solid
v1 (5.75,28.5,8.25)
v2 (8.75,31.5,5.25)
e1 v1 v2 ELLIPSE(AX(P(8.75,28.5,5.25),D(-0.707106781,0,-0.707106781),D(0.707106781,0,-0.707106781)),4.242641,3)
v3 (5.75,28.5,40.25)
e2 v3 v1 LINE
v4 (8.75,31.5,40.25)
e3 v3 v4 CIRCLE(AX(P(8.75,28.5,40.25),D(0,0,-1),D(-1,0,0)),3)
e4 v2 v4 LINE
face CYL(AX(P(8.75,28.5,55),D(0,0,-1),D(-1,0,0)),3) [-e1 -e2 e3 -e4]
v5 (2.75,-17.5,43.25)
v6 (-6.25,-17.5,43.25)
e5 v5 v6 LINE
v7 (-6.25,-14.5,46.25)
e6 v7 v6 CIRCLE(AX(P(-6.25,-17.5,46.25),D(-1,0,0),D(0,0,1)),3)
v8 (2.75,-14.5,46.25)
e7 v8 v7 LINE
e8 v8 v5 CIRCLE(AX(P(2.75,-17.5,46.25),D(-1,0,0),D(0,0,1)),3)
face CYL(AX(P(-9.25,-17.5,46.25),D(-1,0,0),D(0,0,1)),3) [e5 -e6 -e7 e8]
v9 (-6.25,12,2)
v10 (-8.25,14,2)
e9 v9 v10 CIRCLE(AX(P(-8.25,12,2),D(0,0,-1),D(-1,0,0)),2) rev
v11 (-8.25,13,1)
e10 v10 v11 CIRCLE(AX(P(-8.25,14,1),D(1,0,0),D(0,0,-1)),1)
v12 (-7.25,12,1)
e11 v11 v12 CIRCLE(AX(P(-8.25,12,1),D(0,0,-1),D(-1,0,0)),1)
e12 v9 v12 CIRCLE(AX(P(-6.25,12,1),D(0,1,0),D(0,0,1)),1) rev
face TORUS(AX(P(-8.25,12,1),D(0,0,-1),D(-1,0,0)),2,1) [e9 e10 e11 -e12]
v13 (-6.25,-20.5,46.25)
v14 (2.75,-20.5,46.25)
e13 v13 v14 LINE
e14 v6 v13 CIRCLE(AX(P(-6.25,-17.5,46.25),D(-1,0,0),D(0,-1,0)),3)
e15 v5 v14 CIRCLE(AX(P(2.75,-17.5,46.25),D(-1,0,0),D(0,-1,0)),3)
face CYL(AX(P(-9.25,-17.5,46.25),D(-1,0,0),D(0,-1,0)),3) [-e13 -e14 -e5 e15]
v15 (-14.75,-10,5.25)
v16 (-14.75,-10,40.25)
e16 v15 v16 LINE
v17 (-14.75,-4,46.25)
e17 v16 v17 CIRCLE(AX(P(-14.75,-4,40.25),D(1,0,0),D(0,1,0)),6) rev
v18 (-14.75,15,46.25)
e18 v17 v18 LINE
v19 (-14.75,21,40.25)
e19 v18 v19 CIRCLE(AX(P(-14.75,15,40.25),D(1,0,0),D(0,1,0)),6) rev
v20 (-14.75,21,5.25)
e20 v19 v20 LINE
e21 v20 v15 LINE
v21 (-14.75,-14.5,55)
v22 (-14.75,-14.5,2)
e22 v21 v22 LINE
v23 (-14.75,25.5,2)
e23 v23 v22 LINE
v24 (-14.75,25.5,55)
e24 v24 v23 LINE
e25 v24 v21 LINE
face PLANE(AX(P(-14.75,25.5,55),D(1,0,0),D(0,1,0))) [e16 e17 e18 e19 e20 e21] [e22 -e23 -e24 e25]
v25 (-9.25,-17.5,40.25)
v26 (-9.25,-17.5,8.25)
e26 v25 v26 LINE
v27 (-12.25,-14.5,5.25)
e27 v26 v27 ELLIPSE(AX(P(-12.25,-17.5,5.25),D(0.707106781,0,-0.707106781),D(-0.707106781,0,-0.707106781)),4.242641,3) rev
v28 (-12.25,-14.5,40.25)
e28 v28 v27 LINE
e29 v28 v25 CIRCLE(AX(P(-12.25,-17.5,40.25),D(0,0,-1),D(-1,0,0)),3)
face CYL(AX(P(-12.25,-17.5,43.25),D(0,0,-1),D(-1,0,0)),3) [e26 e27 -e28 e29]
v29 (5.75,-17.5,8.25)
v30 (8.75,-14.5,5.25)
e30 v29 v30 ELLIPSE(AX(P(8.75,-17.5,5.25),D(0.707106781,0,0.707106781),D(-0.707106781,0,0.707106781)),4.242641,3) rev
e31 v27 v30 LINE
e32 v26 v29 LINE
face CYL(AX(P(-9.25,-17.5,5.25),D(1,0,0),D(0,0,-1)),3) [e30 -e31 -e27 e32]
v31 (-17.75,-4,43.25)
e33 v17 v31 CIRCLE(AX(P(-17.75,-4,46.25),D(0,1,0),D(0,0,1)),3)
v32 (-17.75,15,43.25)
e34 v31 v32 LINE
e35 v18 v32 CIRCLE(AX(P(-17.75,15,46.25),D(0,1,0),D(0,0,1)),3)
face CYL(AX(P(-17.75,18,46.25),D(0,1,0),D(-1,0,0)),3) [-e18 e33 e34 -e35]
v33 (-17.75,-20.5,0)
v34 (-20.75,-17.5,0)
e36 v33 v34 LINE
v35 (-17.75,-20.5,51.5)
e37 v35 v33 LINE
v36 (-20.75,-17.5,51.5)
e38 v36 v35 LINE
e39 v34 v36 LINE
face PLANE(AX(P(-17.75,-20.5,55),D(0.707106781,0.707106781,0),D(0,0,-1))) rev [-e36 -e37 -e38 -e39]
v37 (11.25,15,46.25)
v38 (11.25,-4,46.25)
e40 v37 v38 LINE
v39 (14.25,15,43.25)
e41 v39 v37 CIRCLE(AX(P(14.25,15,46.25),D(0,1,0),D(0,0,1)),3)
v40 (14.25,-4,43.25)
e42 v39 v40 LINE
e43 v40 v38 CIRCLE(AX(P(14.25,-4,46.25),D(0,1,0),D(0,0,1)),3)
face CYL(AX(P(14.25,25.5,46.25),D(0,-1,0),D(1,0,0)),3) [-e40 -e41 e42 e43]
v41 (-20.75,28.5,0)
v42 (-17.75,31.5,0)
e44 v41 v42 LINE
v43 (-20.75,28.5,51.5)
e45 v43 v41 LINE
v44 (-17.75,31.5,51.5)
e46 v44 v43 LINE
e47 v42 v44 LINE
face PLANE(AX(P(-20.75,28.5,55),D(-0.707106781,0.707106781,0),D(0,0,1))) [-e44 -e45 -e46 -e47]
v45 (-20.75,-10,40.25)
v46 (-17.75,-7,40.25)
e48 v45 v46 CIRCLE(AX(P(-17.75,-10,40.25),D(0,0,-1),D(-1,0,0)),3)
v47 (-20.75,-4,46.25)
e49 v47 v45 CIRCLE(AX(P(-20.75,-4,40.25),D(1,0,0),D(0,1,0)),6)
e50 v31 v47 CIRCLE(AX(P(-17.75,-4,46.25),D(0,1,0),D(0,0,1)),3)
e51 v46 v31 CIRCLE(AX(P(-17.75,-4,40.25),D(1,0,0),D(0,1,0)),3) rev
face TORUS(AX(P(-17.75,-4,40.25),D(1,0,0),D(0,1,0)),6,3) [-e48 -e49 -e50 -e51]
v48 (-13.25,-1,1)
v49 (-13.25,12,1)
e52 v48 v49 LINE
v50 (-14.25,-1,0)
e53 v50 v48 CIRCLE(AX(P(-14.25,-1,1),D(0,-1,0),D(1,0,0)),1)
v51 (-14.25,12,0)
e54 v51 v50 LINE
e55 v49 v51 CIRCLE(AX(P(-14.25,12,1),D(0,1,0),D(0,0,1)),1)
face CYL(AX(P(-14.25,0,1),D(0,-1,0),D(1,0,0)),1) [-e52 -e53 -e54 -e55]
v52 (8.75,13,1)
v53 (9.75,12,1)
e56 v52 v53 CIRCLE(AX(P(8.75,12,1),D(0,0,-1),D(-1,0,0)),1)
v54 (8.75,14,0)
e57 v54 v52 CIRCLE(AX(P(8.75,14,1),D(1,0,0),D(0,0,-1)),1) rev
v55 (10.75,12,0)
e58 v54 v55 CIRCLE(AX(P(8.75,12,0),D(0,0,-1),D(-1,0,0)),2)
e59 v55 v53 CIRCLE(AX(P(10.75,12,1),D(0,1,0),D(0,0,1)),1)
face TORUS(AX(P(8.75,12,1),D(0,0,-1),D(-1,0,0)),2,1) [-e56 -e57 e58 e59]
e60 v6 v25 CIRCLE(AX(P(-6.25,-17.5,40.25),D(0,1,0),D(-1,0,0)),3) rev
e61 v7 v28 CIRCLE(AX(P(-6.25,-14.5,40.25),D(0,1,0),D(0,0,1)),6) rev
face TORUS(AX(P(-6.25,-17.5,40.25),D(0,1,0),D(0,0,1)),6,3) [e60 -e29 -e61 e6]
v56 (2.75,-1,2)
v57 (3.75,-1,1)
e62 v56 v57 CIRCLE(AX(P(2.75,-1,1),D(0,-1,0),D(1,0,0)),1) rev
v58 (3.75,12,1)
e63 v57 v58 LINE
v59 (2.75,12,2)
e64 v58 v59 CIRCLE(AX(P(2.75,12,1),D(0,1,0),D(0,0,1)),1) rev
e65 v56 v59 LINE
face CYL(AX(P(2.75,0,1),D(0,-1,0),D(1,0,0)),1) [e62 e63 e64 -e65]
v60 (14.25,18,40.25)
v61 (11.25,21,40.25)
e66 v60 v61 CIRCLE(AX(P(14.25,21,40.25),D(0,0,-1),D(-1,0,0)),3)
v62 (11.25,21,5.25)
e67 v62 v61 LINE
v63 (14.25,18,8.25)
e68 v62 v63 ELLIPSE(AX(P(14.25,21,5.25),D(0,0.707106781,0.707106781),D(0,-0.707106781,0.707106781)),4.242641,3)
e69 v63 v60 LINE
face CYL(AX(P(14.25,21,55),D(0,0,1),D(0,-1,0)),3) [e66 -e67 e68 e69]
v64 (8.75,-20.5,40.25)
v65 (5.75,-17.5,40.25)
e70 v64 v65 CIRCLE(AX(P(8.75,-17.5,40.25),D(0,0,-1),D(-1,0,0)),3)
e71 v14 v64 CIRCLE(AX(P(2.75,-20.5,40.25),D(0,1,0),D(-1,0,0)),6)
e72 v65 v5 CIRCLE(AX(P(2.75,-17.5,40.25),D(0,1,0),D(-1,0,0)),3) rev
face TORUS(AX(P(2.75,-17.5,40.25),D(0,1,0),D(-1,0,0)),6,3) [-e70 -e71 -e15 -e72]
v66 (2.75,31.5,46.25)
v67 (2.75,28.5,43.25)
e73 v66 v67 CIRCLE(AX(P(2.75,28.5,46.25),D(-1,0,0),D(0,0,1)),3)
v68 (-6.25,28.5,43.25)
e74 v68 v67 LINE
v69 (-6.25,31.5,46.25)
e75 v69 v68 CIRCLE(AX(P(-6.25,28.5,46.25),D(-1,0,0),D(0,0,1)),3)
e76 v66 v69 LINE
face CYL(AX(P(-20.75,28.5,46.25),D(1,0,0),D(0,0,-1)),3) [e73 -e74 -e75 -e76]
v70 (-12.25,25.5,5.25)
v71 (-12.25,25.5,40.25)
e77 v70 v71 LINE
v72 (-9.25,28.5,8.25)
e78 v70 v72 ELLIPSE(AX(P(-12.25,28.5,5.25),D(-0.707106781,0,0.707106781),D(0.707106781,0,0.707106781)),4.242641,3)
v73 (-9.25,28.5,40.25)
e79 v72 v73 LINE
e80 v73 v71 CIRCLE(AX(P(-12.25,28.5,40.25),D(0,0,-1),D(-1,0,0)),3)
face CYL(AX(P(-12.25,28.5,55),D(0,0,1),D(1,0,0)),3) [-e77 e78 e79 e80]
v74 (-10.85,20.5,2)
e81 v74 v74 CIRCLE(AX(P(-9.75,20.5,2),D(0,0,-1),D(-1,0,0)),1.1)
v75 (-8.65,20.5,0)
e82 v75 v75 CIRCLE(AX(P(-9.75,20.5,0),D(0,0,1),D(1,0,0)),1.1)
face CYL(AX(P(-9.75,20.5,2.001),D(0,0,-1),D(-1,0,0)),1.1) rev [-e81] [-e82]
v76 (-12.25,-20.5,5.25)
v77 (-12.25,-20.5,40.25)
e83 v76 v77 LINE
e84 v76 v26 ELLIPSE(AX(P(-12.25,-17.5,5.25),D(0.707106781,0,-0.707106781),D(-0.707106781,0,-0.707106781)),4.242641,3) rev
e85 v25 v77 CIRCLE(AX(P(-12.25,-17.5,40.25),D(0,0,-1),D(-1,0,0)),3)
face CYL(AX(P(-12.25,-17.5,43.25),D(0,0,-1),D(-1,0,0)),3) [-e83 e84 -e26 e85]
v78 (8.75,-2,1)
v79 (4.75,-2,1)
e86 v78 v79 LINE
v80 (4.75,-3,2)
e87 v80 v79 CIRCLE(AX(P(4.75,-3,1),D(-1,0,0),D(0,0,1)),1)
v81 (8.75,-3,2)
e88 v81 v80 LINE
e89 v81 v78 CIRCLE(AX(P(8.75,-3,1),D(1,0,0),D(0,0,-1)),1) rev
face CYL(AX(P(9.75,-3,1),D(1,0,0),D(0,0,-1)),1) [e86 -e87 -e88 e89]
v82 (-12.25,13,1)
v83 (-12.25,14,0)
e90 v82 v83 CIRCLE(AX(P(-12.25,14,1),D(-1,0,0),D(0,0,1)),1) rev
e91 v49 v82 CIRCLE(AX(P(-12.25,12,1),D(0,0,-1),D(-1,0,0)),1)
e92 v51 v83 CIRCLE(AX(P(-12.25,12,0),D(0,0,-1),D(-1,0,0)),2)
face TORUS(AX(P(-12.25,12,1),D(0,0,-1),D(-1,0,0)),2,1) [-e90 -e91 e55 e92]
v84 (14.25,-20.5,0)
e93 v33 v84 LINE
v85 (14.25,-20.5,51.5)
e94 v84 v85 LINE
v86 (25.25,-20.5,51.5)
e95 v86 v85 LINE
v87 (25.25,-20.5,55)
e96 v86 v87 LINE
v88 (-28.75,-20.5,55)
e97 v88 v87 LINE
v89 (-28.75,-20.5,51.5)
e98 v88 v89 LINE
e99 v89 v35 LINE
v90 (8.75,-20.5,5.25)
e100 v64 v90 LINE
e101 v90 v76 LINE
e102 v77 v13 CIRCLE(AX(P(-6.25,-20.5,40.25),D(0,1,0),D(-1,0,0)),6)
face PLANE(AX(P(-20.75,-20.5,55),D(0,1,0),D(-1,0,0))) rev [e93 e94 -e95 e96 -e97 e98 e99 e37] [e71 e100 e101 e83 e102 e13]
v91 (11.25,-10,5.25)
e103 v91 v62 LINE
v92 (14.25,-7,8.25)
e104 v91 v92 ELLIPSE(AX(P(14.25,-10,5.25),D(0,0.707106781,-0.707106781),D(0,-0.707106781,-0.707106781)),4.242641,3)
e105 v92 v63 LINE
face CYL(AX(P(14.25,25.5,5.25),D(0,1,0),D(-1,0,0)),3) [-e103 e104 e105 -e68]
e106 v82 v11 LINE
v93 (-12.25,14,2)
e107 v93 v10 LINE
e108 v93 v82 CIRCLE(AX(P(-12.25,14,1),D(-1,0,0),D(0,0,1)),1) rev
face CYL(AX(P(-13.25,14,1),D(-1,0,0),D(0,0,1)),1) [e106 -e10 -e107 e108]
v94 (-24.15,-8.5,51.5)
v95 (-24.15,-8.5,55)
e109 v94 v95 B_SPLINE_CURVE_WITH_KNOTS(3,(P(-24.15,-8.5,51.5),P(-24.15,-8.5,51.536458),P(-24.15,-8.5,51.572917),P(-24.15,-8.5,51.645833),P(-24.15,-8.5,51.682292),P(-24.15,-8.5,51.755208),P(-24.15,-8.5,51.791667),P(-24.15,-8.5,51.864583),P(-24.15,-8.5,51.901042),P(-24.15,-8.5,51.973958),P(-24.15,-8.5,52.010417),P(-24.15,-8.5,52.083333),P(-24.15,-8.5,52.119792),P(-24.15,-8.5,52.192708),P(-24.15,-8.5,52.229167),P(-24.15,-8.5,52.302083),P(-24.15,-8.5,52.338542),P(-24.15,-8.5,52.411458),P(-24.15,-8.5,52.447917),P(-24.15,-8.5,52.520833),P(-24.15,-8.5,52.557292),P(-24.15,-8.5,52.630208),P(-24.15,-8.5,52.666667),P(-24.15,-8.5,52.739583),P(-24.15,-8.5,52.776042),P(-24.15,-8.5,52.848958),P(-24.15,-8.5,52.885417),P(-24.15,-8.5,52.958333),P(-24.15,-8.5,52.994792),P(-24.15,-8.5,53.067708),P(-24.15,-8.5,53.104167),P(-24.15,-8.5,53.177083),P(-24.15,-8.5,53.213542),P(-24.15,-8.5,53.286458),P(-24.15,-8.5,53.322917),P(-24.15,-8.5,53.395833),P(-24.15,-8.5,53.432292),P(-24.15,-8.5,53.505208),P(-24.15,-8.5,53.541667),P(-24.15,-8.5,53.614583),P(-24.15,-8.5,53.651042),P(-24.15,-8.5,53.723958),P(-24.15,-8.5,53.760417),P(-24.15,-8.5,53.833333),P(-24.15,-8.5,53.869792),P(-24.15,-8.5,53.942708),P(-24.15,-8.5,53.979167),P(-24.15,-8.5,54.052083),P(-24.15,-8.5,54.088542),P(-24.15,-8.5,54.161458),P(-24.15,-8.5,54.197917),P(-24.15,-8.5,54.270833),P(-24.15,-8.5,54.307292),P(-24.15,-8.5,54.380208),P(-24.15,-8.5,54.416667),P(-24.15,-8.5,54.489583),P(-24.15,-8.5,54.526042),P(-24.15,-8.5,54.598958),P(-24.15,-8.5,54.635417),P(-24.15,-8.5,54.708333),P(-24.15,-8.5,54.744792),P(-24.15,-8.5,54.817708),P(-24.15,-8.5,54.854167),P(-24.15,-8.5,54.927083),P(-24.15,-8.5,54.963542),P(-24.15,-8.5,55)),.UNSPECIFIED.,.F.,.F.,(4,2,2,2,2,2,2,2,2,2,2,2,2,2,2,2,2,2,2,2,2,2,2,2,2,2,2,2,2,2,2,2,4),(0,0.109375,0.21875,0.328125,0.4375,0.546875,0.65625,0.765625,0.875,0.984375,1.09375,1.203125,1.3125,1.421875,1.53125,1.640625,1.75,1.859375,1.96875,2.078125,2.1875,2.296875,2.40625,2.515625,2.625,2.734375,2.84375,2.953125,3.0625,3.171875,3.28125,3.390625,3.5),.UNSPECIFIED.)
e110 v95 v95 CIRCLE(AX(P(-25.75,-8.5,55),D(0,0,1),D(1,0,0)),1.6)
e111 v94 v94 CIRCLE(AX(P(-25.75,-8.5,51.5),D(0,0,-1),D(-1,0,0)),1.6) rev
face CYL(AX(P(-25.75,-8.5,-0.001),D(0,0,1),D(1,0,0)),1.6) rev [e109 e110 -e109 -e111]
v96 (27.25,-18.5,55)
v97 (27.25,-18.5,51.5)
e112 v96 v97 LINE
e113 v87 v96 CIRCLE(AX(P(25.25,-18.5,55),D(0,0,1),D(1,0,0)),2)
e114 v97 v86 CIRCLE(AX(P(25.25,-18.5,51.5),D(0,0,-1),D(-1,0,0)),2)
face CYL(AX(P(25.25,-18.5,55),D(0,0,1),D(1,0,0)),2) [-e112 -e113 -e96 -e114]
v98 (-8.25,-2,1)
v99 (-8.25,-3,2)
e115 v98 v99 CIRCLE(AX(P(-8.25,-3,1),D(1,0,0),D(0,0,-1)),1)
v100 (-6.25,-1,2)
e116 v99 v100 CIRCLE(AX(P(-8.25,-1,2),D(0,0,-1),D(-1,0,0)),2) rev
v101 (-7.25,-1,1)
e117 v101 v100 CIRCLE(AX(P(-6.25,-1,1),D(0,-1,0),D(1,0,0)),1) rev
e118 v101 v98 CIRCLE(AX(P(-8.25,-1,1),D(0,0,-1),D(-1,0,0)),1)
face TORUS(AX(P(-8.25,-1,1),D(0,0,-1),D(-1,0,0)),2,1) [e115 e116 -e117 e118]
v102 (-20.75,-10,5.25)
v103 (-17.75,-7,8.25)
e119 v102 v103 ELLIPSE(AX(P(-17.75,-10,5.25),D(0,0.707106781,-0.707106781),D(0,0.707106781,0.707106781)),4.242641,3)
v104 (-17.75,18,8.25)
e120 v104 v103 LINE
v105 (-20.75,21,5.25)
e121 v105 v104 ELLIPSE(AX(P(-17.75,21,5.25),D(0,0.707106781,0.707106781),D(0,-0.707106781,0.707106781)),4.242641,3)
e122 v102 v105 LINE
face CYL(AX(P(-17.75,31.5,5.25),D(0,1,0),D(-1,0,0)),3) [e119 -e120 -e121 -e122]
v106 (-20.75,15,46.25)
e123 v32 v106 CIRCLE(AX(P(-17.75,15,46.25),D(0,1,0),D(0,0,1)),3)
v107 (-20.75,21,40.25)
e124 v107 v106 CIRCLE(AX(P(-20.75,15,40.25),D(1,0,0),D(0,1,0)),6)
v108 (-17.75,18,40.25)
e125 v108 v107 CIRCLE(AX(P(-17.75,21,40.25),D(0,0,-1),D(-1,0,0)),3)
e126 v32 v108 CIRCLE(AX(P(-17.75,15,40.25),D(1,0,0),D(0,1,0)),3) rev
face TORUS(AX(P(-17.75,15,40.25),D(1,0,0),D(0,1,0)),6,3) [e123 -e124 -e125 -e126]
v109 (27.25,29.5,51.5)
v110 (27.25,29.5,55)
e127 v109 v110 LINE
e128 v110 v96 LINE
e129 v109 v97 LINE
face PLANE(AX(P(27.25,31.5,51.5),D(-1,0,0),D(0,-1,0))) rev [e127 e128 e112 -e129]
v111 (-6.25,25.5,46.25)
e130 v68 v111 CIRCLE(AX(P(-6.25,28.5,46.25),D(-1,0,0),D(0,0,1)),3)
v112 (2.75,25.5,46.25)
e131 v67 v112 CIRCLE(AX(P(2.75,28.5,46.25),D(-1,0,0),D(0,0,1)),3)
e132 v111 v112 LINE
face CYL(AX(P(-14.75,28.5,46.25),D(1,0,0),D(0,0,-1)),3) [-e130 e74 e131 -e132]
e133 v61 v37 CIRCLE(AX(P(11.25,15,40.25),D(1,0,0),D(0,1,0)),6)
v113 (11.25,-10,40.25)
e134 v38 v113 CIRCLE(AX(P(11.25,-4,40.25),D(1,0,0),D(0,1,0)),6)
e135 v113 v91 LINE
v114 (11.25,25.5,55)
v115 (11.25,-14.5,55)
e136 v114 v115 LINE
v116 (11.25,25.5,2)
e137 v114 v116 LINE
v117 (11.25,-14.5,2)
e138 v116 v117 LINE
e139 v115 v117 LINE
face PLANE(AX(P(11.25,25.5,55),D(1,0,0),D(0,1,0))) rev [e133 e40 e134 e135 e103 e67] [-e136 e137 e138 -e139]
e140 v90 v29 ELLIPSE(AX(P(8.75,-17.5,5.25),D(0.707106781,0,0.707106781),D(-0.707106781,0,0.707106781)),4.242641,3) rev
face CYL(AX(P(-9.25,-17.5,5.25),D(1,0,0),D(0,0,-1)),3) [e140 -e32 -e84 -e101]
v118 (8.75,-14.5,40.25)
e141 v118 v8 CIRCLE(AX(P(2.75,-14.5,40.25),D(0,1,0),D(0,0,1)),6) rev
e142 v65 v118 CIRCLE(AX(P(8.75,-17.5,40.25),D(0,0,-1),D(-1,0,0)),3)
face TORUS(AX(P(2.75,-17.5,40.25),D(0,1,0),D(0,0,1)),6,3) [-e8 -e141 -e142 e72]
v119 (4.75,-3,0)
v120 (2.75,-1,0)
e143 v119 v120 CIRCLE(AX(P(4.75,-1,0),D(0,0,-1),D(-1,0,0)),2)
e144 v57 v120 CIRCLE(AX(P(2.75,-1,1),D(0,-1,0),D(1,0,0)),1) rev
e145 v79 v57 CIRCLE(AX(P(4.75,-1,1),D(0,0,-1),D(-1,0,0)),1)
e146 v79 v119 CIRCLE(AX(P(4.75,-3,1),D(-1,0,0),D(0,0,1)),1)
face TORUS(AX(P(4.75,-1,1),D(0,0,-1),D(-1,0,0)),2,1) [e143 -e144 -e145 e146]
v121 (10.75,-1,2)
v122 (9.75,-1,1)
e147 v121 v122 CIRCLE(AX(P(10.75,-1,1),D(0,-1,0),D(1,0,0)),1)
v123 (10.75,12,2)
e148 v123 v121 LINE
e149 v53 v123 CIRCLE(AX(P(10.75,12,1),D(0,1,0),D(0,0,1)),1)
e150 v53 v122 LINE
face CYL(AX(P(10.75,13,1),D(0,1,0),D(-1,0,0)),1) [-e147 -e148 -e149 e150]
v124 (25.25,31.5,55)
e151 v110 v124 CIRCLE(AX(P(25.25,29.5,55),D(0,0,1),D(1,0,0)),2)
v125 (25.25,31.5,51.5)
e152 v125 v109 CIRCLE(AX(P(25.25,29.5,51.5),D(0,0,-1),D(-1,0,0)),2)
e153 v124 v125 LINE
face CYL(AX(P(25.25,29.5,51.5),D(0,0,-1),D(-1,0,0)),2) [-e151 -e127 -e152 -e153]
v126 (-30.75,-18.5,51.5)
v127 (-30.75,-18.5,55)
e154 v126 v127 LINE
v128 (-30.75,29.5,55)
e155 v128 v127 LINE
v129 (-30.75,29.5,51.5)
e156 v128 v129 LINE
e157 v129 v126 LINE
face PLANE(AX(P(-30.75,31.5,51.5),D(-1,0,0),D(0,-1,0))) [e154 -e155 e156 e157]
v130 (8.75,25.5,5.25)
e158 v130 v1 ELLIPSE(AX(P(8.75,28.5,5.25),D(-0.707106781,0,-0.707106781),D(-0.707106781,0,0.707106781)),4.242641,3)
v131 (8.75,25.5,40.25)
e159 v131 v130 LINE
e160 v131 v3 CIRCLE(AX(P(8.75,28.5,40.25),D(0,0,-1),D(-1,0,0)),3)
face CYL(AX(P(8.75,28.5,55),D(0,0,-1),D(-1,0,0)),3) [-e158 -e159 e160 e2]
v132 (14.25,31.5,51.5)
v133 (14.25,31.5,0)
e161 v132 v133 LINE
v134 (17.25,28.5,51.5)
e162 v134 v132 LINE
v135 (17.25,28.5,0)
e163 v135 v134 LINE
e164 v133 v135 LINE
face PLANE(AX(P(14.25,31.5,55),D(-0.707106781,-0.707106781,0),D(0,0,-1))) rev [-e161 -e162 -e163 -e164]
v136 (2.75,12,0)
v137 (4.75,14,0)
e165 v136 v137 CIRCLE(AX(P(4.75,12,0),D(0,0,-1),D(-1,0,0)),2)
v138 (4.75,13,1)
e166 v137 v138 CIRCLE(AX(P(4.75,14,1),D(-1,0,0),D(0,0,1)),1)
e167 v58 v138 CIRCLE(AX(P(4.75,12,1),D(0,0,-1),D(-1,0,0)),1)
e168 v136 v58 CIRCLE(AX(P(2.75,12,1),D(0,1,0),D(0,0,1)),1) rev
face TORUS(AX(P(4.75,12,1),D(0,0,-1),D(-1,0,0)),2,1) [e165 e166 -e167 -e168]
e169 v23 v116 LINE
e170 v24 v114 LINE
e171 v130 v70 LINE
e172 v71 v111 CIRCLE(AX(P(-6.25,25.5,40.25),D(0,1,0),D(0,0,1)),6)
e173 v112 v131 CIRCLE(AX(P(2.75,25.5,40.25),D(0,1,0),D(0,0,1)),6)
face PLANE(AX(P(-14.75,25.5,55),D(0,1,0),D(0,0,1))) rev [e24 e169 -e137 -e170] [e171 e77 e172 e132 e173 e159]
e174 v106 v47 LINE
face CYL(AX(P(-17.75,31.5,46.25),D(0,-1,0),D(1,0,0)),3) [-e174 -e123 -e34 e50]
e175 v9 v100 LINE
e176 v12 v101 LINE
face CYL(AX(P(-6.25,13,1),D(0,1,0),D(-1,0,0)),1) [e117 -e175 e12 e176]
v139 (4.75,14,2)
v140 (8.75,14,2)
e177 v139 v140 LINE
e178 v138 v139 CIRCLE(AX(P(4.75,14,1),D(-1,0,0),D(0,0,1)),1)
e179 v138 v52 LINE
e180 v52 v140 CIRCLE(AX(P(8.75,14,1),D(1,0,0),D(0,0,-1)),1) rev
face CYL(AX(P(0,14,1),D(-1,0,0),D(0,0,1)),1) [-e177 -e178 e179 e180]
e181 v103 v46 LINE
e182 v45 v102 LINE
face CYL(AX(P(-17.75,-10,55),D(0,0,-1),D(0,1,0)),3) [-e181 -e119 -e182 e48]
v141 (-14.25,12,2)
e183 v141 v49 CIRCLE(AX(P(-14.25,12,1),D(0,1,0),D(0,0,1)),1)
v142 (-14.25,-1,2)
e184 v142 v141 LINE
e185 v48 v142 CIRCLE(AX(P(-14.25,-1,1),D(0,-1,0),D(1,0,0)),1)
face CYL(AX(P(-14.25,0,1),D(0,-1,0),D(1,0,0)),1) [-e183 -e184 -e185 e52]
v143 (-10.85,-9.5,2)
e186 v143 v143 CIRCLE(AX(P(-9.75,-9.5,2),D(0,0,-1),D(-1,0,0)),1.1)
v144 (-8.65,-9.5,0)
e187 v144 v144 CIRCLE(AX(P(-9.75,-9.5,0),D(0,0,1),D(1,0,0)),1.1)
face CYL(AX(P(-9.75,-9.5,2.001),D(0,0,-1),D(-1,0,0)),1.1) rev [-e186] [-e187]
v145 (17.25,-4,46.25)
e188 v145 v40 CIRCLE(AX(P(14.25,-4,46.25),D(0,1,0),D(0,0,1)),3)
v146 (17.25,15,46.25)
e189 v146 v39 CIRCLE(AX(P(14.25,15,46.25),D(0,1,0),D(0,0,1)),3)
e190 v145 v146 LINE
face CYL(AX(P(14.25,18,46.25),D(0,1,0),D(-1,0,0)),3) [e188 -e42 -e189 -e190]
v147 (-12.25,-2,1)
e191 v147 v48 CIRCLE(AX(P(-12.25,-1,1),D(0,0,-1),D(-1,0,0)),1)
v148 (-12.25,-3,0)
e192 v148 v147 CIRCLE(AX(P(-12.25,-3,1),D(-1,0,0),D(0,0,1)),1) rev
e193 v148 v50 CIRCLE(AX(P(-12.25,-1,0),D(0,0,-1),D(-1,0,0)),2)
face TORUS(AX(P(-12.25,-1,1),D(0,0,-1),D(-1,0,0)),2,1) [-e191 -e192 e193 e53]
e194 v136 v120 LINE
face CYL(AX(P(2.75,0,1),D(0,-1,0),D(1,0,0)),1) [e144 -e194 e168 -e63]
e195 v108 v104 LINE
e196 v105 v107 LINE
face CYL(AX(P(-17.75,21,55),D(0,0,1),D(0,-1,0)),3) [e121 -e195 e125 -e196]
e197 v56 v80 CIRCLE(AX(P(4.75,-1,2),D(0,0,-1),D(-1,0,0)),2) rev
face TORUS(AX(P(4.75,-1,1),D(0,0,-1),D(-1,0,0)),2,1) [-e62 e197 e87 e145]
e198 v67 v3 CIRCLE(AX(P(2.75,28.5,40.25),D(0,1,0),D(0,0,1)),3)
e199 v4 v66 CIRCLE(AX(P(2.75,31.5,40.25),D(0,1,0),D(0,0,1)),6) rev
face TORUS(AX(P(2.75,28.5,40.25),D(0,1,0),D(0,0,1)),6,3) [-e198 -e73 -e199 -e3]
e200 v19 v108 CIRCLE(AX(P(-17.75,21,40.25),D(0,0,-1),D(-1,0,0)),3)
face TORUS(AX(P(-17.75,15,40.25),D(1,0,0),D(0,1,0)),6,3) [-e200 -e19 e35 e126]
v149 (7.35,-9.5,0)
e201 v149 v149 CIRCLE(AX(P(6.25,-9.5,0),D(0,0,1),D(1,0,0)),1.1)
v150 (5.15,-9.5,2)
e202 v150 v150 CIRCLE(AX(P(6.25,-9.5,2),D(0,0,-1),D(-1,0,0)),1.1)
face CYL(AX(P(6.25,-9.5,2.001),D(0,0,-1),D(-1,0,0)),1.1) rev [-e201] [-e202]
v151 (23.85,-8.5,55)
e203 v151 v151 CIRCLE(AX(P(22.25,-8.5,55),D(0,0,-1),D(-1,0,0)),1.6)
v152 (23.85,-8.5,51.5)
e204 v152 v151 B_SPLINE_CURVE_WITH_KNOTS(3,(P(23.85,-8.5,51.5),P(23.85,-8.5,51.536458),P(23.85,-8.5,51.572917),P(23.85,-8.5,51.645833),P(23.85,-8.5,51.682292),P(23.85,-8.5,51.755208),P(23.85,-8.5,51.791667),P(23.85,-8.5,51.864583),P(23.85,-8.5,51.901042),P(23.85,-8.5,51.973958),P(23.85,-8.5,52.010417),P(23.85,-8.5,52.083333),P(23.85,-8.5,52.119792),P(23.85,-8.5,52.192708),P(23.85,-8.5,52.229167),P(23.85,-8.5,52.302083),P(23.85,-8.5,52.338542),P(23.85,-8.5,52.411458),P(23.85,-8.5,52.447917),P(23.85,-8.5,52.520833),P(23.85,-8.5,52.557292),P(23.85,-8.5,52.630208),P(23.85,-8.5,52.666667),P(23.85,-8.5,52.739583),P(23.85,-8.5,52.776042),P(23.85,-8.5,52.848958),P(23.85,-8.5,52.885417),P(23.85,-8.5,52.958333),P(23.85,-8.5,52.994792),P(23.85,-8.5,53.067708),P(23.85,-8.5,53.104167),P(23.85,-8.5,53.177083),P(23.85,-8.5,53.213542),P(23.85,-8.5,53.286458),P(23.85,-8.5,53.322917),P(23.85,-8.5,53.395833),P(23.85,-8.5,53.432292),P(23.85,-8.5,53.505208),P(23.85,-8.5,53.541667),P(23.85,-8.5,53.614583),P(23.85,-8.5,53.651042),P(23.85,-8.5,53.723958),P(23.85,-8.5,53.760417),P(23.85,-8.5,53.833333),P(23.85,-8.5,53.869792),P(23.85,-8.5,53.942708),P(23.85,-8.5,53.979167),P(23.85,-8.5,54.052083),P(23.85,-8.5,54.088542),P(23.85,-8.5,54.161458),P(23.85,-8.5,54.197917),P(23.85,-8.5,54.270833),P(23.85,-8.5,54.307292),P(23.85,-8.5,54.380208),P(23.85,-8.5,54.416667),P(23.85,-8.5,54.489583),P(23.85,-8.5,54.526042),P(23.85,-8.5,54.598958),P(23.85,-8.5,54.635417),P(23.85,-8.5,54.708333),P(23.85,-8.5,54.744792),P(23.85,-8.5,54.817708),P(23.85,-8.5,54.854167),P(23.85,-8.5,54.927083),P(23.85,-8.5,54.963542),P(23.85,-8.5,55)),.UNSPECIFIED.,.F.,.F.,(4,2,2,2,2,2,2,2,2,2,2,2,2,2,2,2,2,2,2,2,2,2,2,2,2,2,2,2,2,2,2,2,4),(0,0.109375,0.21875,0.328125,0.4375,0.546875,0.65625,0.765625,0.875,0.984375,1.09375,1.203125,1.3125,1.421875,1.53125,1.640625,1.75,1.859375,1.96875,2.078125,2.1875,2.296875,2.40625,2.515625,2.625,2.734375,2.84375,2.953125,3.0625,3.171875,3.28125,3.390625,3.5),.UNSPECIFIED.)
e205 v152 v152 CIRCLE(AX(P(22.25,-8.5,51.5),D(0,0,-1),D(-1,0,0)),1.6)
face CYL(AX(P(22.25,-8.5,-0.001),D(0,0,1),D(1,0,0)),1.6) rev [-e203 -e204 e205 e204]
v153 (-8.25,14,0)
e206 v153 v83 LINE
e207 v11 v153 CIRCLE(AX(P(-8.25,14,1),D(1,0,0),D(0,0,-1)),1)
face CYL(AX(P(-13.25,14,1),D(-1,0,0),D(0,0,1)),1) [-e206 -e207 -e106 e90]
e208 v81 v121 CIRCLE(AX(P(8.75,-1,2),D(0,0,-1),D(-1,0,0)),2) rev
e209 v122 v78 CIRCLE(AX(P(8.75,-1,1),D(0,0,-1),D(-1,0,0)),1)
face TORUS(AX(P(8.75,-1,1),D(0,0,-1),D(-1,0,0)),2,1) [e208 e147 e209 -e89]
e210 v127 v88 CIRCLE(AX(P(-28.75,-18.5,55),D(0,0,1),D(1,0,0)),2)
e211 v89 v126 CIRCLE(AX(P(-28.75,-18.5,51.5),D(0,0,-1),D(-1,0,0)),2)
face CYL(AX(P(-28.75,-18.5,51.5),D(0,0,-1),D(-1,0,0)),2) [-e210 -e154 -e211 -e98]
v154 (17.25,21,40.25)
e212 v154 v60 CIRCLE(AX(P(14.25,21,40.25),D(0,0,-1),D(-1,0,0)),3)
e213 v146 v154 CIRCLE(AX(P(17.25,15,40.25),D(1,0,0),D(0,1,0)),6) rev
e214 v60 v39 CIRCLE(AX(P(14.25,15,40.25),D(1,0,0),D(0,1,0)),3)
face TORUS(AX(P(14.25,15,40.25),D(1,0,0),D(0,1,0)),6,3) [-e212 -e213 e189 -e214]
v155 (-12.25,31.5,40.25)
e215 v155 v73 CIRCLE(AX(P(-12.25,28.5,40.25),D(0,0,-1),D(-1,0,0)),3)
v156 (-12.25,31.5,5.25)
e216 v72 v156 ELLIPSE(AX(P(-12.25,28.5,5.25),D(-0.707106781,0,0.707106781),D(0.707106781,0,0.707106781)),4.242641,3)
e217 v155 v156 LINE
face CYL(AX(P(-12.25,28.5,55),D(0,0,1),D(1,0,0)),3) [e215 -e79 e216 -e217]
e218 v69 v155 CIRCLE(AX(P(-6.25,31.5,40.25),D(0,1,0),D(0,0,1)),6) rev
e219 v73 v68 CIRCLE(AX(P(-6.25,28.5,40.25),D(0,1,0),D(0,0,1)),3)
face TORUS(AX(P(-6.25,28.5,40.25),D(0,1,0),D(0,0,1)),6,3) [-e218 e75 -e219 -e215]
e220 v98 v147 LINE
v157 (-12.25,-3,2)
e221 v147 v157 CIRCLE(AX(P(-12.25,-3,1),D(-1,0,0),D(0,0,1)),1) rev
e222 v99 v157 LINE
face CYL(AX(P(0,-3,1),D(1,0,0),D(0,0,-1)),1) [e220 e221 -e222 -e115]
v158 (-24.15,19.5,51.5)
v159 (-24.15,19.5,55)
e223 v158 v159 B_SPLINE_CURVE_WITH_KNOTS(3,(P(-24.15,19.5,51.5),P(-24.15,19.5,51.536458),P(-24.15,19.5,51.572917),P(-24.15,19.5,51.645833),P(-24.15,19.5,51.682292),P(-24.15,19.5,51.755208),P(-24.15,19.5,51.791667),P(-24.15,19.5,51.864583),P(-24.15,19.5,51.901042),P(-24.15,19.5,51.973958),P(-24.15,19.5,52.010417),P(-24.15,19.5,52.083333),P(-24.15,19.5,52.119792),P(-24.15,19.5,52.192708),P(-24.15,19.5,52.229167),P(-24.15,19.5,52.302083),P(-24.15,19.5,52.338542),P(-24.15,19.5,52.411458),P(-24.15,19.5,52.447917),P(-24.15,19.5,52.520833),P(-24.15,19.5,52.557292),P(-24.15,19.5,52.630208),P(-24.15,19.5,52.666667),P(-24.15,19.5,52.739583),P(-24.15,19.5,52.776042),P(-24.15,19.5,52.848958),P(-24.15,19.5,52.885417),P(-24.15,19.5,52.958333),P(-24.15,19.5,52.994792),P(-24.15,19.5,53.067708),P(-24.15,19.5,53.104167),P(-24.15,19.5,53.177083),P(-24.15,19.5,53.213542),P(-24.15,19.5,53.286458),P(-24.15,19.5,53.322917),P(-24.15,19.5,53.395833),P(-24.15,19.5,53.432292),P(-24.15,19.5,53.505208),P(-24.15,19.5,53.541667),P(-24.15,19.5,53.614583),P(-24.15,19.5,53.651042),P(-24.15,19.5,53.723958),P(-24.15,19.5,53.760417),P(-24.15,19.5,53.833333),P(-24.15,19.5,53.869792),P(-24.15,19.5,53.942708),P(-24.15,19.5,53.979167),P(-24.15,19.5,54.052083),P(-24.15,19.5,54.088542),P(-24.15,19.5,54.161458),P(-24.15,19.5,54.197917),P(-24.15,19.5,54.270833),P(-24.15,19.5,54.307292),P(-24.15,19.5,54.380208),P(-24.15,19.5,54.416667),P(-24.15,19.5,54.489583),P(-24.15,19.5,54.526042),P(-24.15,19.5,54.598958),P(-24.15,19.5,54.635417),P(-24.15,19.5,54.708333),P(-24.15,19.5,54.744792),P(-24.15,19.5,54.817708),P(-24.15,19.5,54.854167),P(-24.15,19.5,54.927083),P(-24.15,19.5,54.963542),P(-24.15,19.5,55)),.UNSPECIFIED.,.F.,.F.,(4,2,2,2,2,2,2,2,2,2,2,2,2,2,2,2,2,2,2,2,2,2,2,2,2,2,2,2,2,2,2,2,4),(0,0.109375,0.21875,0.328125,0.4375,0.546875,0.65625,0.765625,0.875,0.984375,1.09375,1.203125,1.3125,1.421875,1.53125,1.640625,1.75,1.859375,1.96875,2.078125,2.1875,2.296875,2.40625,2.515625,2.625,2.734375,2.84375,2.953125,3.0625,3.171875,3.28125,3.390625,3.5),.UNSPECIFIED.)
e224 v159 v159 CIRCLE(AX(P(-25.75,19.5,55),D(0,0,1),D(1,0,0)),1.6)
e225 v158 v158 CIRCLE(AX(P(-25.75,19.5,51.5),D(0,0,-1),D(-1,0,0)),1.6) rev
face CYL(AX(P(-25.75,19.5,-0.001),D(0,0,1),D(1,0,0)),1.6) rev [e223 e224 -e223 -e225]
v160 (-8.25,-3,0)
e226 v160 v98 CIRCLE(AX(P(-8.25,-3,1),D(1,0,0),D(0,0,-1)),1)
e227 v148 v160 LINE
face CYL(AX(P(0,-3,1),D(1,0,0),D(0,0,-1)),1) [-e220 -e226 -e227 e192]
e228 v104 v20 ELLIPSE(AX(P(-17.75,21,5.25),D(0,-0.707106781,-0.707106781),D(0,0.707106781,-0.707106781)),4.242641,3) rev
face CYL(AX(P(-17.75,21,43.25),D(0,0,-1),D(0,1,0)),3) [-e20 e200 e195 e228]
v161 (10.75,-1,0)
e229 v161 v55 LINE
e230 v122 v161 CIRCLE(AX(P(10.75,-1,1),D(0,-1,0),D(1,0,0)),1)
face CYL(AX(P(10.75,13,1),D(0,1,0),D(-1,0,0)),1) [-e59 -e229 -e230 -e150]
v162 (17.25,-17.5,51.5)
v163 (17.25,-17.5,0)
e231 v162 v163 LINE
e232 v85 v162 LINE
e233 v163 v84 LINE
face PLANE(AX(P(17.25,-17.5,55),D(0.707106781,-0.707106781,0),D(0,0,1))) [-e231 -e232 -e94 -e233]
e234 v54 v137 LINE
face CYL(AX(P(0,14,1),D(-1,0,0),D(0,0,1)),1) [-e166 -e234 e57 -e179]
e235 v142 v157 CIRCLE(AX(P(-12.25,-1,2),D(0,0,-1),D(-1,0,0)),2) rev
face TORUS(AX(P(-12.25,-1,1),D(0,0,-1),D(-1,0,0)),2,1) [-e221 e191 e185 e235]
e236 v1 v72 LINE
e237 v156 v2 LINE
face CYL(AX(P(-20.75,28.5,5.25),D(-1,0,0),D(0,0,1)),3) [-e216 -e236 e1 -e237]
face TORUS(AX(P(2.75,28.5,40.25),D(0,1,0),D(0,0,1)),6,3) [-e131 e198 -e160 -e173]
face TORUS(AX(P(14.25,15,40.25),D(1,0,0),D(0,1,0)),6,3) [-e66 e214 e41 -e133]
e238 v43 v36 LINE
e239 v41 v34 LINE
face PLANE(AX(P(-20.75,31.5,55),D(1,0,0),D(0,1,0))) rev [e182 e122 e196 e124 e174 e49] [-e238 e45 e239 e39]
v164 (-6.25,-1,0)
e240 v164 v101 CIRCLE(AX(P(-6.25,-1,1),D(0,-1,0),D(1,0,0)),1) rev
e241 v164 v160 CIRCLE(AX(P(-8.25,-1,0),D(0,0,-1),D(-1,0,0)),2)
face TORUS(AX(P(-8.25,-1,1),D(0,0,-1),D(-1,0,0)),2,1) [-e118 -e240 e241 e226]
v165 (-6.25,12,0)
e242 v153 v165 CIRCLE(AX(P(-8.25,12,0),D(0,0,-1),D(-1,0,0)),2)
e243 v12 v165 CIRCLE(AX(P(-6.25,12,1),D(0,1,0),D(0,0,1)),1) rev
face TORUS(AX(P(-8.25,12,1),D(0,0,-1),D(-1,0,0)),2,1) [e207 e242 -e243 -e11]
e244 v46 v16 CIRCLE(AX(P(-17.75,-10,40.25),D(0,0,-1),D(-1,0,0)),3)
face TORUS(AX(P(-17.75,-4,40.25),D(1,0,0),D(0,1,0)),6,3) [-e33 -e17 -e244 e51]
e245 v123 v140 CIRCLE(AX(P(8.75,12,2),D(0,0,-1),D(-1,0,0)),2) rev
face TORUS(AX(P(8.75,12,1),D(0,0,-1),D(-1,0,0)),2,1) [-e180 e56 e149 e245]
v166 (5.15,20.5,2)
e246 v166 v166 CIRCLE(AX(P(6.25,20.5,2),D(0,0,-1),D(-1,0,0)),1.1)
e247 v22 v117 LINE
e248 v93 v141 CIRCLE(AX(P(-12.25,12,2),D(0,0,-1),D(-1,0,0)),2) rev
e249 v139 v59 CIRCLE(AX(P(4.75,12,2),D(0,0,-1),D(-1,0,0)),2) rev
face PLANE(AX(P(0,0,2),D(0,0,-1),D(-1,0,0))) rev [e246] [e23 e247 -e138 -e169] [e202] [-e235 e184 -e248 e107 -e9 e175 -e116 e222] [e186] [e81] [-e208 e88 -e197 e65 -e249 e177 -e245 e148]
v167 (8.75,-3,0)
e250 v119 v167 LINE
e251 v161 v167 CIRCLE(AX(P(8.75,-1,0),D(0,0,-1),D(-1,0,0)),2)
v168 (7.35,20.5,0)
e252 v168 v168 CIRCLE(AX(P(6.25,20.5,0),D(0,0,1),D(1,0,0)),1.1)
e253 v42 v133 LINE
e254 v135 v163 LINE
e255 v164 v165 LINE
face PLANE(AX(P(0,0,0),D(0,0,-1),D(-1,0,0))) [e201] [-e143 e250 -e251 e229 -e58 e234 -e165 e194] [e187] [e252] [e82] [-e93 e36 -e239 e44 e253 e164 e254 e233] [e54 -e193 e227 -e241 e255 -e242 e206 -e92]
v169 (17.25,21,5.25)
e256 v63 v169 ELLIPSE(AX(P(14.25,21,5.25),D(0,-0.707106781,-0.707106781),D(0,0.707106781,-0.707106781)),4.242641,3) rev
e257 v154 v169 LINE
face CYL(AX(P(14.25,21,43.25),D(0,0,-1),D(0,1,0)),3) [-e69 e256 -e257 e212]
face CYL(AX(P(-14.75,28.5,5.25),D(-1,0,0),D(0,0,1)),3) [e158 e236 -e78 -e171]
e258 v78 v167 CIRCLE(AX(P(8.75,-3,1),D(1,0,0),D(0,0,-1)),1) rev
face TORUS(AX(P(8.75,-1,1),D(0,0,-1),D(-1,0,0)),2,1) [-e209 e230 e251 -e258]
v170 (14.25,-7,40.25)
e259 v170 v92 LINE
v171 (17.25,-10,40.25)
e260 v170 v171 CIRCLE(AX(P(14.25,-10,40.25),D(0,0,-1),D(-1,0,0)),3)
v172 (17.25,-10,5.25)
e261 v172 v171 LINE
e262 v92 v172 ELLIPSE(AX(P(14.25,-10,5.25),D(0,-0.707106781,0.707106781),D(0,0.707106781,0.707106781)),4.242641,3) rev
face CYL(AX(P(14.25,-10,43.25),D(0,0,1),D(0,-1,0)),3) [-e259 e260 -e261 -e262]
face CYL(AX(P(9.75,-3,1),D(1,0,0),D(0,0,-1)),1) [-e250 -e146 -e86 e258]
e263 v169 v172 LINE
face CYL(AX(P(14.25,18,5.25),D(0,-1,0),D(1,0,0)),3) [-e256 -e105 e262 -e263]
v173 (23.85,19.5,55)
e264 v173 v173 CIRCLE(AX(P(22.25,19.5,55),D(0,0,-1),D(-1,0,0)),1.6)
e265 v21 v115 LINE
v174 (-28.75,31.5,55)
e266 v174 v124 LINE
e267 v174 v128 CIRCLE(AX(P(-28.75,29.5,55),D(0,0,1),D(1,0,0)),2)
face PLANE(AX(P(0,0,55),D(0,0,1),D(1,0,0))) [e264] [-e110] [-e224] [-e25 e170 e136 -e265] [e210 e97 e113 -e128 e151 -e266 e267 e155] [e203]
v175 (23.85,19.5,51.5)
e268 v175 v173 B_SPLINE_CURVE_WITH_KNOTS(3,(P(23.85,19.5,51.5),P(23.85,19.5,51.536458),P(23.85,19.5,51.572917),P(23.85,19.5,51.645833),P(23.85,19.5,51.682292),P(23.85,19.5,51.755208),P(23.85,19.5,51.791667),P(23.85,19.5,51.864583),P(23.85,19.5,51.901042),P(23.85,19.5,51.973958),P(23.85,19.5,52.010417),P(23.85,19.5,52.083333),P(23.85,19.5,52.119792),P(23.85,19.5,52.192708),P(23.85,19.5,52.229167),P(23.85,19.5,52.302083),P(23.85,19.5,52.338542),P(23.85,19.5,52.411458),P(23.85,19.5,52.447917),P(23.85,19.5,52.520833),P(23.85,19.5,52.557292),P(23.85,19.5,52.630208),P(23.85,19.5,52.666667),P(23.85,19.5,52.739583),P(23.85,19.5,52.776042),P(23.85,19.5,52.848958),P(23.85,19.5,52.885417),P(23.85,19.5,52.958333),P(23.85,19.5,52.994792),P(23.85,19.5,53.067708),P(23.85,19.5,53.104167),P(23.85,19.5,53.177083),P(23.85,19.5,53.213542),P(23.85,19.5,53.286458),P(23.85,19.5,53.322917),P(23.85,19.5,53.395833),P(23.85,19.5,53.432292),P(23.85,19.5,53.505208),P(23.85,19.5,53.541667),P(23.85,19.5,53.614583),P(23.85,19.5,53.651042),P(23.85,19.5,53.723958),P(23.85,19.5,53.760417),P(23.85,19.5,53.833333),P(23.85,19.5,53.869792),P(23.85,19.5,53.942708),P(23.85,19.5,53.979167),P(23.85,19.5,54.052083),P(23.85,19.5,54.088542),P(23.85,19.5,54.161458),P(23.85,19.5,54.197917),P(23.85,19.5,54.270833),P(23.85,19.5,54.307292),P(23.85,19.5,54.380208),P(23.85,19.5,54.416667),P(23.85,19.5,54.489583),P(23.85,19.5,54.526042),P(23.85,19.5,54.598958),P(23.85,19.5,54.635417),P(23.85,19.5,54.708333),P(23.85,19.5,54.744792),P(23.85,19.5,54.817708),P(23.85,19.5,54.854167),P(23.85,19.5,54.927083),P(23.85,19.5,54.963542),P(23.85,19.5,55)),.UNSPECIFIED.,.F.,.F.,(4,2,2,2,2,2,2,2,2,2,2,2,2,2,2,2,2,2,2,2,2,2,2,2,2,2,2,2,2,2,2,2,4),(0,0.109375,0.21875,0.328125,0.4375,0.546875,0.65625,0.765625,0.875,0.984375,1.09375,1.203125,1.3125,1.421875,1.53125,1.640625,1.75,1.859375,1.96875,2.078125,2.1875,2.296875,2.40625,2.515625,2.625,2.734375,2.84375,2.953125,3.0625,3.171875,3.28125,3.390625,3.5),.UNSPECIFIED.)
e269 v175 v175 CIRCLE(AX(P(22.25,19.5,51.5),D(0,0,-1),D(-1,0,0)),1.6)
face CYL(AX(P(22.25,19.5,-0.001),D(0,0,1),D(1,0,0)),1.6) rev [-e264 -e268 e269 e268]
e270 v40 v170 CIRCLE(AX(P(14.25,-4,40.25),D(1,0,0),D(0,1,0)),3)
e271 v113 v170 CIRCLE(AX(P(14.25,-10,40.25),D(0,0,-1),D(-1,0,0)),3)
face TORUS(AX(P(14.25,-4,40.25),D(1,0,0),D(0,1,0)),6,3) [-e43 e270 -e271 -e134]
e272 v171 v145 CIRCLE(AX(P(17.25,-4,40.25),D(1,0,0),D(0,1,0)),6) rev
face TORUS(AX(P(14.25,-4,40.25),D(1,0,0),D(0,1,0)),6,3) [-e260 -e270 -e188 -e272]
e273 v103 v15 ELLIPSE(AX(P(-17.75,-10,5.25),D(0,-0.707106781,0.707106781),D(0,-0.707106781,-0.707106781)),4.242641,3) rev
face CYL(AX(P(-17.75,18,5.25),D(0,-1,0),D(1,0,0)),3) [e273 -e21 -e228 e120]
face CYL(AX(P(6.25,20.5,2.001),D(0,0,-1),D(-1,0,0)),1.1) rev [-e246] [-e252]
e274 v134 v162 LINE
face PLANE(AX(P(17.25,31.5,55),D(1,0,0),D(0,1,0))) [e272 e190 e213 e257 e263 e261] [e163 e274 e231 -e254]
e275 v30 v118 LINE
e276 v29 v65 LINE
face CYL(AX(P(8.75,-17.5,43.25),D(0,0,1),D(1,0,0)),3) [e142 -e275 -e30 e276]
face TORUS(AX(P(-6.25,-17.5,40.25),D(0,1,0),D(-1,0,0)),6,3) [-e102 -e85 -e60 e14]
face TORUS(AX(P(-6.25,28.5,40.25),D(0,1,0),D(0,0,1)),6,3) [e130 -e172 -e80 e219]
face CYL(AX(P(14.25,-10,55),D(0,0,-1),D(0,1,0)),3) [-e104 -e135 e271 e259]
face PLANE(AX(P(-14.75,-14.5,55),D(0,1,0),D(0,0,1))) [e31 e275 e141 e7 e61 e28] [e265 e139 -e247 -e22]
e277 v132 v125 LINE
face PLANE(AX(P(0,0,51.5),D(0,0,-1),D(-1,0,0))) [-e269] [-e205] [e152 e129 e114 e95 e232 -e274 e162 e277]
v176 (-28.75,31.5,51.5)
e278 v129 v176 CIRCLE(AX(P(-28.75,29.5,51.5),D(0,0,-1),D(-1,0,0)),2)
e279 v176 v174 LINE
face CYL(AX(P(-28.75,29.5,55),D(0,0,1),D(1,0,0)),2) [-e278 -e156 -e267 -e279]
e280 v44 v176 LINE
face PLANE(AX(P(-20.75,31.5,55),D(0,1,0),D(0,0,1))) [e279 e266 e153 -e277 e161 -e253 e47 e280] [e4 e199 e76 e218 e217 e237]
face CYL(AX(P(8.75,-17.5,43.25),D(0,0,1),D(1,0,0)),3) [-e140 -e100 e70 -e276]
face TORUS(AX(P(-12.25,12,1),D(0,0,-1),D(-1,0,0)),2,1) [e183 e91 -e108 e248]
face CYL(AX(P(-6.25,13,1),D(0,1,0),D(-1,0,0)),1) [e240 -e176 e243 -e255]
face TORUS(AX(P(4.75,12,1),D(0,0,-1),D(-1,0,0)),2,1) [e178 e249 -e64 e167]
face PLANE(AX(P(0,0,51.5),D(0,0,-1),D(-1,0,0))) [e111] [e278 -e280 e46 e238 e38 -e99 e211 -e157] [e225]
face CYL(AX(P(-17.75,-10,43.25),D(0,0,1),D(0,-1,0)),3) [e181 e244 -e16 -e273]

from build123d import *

# Parameters (mm, degrees)
SKETCH_1_W            = 26
SKETCH_1_H            = 40
EXTRUDE_1_DEPTH       = 2
CUT_EXTRUDE_1_REACH   = 31.526
SKETCH_1_3_R          = 1.1
SKETCH_1_4_W          = 38
SKETCH_1_4_H          = 52
SKETCH_1_4_W_2        = 26
SKETCH_1_4_H_2        = 40
EXTRUDE_2_DEPTH       = 55
EXTRUDE_START         = -3.5
EXTRUDE_1_2_OUTLINE_W = 10
EXTRUDE_1_2_OUTLINE_H = 52
EXTRUDE_1_2_DEPTH     = 3.5
SKETCH_3_4_W          = 10
SKETCH_3_4_H          = 52
EXTRUDE_2_2_DEPTH     = 3.5
CUT_EXTRUDE_2_REACH   = 72.447
SKETCH_3_5_R          = 1.6
FILLET_1_R            = 2
CHAMFER_1_SIZE        = 3
CUT_EXTRUDE_3_REACH   = 72.447
SKETCH_1_5_W          = 6
SKETCH_1_5_H          = 15
SKETCH_4_W            = 35
SKETCH_4_H            = 25
CUT_EXTRUDE_4_DEPTH   = 80.506289059
SKETCH_5_W            = 15
SKETCH_5_H            = 35
CUT_EXTRUDE_5_DEPTH   = 82.697995691
FILLET_2_R            = 3
FILLET_3_R            = 3
FILLET_4_R            = 1


# Read off the part's stored shape, not the designer's step: 拉伸-薄壁1
with BuildPart() as part:
    # 草图1 → Extrude 1 (new body)
    with BuildSketch(Plane.XY):
        with Locations((-1.75, 5.5)):
            Rectangle(SKETCH_1_W, SKETCH_1_H)
    extrude(amount=EXTRUDE_1_DEPTH)

    # 草图1<3> → 切除-拉伸1 (cut, up to next)
    with BuildSketch(Plane.XY, mode=Mode.PRIVATE) as cut_extrude_1_sk1:
        with Locations(Location((-9.75, 20.5, 0), (0, 0, 180))):
            Circle(SKETCH_1_3_R)
    cut_extrude_1_tool1 = extrude(cut_extrude_1_sk1.sketch, amount=CUT_EXTRUDE_1_REACH, mode=Mode.PRIVATE) & part.part
    # 草图1<3> → 切除-拉伸1 (cut, up to next)
    with BuildSketch(Plane.XY, mode=Mode.PRIVATE) as cut_extrude_1_sk2:
        with Locations(Location((6.25, 20.5, 0), (0, 0, 180))):
            Circle(SKETCH_1_3_R)
    cut_extrude_1_tool2 = extrude(cut_extrude_1_sk2.sketch, amount=CUT_EXTRUDE_1_REACH, mode=Mode.PRIVATE) & part.part
    # 草图1<3> → 切除-拉伸1 (cut, up to next)
    with BuildSketch(Plane.XY, mode=Mode.PRIVATE) as cut_extrude_1_sk3:
        with Locations(Location((-9.75, -9.5, 0), (0, 0, 180))):
            Circle(SKETCH_1_3_R)
    cut_extrude_1_tool3 = extrude(cut_extrude_1_sk3.sketch, amount=CUT_EXTRUDE_1_REACH, mode=Mode.PRIVATE) & part.part
    # 草图1<3> → 切除-拉伸1 (cut, up to next)
    with BuildSketch(Plane.XY, mode=Mode.PRIVATE) as cut_extrude_1_sk4:
        with Locations(Location((6.25, -9.5, 0), (0, 0, 180))):
            Circle(SKETCH_1_3_R)
    cut_extrude_1_tool4 = extrude(cut_extrude_1_sk4.sketch, amount=CUT_EXTRUDE_1_REACH, mode=Mode.PRIVATE) & part.part
    add(cut_extrude_1_tool1.solids().sort_by_distance((-9.75, 20.5, 0))[0], mode=Mode.SUBTRACT)
    add(cut_extrude_1_tool2.solids().sort_by_distance((6.25, 20.5, 0))[0], mode=Mode.SUBTRACT)
    add(cut_extrude_1_tool3.solids().sort_by_distance((-9.75, -9.5, 0))[0], mode=Mode.SUBTRACT)
    add(cut_extrude_1_tool4.solids().sort_by_distance((6.25, -9.5, 0))[0], mode=Mode.SUBTRACT)

    # 草图1<4> → Extrude 2 (add)
    with BuildSketch(Plane.XY):
        with Locations((-1.75, 5.5)):
            Rectangle(SKETCH_1_4_W, SKETCH_1_4_H)
        with Locations((-1.75, 5.5)):
            Rectangle(SKETCH_1_4_W_2, SKETCH_1_4_H_2, mode=Mode.SUBTRACT)
    extrude(amount=EXTRUDE_2_DEPTH)

    # Extrude 1 2 outline → Extrude 1 2 (add)
    with BuildSketch(Plane.XY.offset(55).offset(EXTRUDE_START)):
        with Locations((-25.75, 5.5)):
            Rectangle(EXTRUDE_1_2_OUTLINE_W, EXTRUDE_1_2_OUTLINE_H)
    extrude(amount=EXTRUDE_1_2_DEPTH)

    # 草图3<4> → Extrude 2 2 (add)
    with BuildSketch(Plane.XY.offset(55)):
        with Locations((22.25, 5.5)):
            Rectangle(SKETCH_3_4_W, SKETCH_3_4_H)
    extrude(amount=-EXTRUDE_2_2_DEPTH)

    # 草图3<5> → 切除-拉伸2 (cut, up to next)
    with BuildSketch(Plane.XY.offset(55), mode=Mode.PRIVATE) as cut_extrude_2_sk1:
        with Locations((-25.75, 19.5)):
            Circle(SKETCH_3_5_R)
    cut_extrude_2_tool1 = extrude(cut_extrude_2_sk1.sketch, amount=-CUT_EXTRUDE_2_REACH, mode=Mode.PRIVATE) & part.part
    # 草图3<5> → 切除-拉伸2 (cut, up to next)
    with BuildSketch(Plane.XY.offset(55), mode=Mode.PRIVATE) as cut_extrude_2_sk2:
        with Locations((22.25, 19.5)):
            Circle(SKETCH_3_5_R)
    cut_extrude_2_tool2 = extrude(cut_extrude_2_sk2.sketch, amount=-CUT_EXTRUDE_2_REACH, mode=Mode.PRIVATE) & part.part
    # 草图3<5> → 切除-拉伸2 (cut, up to next)
    with BuildSketch(Plane.XY.offset(55), mode=Mode.PRIVATE) as cut_extrude_2_sk3:
        with Locations((-25.75, -8.5)):
            Circle(SKETCH_3_5_R)
    cut_extrude_2_tool3 = extrude(cut_extrude_2_sk3.sketch, amount=-CUT_EXTRUDE_2_REACH, mode=Mode.PRIVATE) & part.part
    # 草图3<5> → 切除-拉伸2 (cut, up to next)
    with BuildSketch(Plane.XY.offset(55), mode=Mode.PRIVATE) as cut_extrude_2_sk4:
        with Locations((22.25, -8.5)):
            Circle(SKETCH_3_5_R)
    cut_extrude_2_tool4 = extrude(cut_extrude_2_sk4.sketch, amount=-CUT_EXTRUDE_2_REACH, mode=Mode.PRIVATE) & part.part
    add(cut_extrude_2_tool1.solids().sort_by_distance((-25.75, 19.5, 55))[0], mode=Mode.SUBTRACT)
    add(cut_extrude_2_tool2.solids().sort_by_distance((22.25, 19.5, 55))[0], mode=Mode.SUBTRACT)
    add(cut_extrude_2_tool3.solids().sort_by_distance((-25.75, -8.5, 55))[0], mode=Mode.SUBTRACT)
    add(cut_extrude_2_tool4.solids().sort_by_distance((22.25, -8.5, 55))[0], mode=Mode.SUBTRACT)

    # 圆角1
    fillet_1_edges = [part.edges().sort_by_distance(p)[0] for p in [
        (-30.75, -20.5, 53.25),
        (-30.75, 31.5, 53.25),
        (27.25, 31.5, 53.25),
        (27.25, -20.5, 53.25),
    ]]
    fillet(fillet_1_edges, radius=FILLET_1_R)

    # 倒角1
    chamfer_1_edges = [part.edges().sort_by_distance(p)[0] for p in [
        (-20.75, -20.5, 25.75),
        (-20.75, 31.5, 25.75),
        (17.25, 31.5, 25.75),
        (17.25, -20.5, 25.75),
    ]]
    chamfer(chamfer_1_edges, length=CHAMFER_1_SIZE)

    # 草图1<5> → 切除-拉伸3 (cut, up to next)
    with BuildSketch(Plane.XY, mode=Mode.PRIVATE) as cut_extrude_3_sk1:
        with Locations((-10.25, 5.5)):
            Rectangle(SKETCH_1_5_W, SKETCH_1_5_H)
    cut_extrude_3_tool1 = extrude(cut_extrude_3_sk1.sketch, amount=CUT_EXTRUDE_3_REACH, mode=Mode.PRIVATE) & part.part
    # 草图1<5> → 切除-拉伸3 (cut, up to next)
    with BuildSketch(Plane.XY, mode=Mode.PRIVATE) as cut_extrude_3_sk2:
        with Locations((6.75, 5.5)):
            Rectangle(SKETCH_1_5_W, SKETCH_1_5_H)
    cut_extrude_3_tool2 = extrude(cut_extrude_3_sk2.sketch, amount=CUT_EXTRUDE_3_REACH, mode=Mode.PRIVATE) & part.part
    add(cut_extrude_3_tool1.solids().sort_by_distance((-10.25, 5.5, 0))[0], mode=Mode.SUBTRACT)
    add(cut_extrude_3_tool2.solids().sort_by_distance((6.75, 5.5, 0))[0], mode=Mode.SUBTRACT)

    # 草图4 → 切除-拉伸4 (cut, through all)
    with BuildSketch(Plane(origin=(17.25, 0, 0), x_dir=(0, 0, -1), z_dir=(1, 0, 0))):
        with Locations((-25.75, 5.5)):
            Rectangle(SKETCH_4_W, SKETCH_4_H)
    extrude(amount=-CUT_EXTRUDE_4_DEPTH, mode=Mode.SUBTRACT)

    # 草图5 → 切除-拉伸5 (cut, through all)
    with BuildSketch(Plane.XZ.offset(20.5)):
        with Locations((-1.75, 25.75)):
            Rectangle(SKETCH_5_W, SKETCH_5_H)
    extrude(amount=-CUT_EXTRUDE_5_DEPTH, mode=Mode.SUBTRACT)

    # 圆角2
    fillet_2_edges = [part.edges().sort_by_distance(p)[0] for p in [
        (-17.75, -7, 43.25),
        (14.25, -7, 43.25),
        (-17.75, 18, 43.25),
        (14.25, 18, 43.25),
        (-9.25, 28.5, 43.25),
        (5.75, 28.5, 43.25),
        (-9.25, -17.5, 43.25),
        (5.75, -17.5, 43.25),
    ]]
    fillet(fillet_2_edges, radius=FILLET_2_R)

    # 圆角3
    fillet_3_edges = [part.edges().sort_by_distance(p)[0] for p in [
        (11.25, 18, 24.25),
        (11.25, -7, 24.25),
        (11.25, -6.121320344, 42.371320344),
        (11.25, 5.5, 43.25),
        (17.25, -7, 24.25),
        (17.25, -6.121320344, 42.371320344),
        (17.25, 5.5, 43.25),
        (17.25, 17.121320344, 42.371320344),
        (-9.25, -14.5, 24.25),
        (-8.371320344, -14.5, 42.371320344),
        (-1.75, -14.5, 43.25),
        (4.871320344, -14.5, 42.371320344),
        (-9.25, -20.5, 24.25),
        (-8.371320344, -20.5, 42.371320344),
        (-1.75, -20.5, 43.25),
        (4.871320344, -20.5, 42.371320344),
        (-9.25, 25.5, 24.25),
        (-8.371320344, 25.5, 42.371320344),
        (-1.75, 25.5, 43.25),
        (4.871320344, 25.5, 42.371320344),
        (5.75, 31.5, 24.25),
        (4.871320344, 31.5, 42.371320344),
        (-1.75, 31.5, 43.25),
        (-8.371320344, 31.5, 42.371320344),
        (-14.75, 18, 24.25),
        (-14.75, 17.121320344, 42.371320344),
        (-14.75, 5.5, 43.25),
        (-14.75, -6.121320344, 42.371320344),
        (-20.75, 18, 24.25),
        (-20.75, 17.121320344, 42.371320344),
        (-20.75, 5.5, 43.25),
        (-20.75, -6.121320344, 42.371320344),
        (11.25, 17.121320344, 42.371320344),
        (17.25, 18, 24.25),
        (11.25, 5.5, 8.25),
        (17.25, 5.5, 8.25),
        (5.75, -14.5, 24.25),
        (5.75, -20.5, 24.25),
        (-1.75, -14.5, 8.25),
        (-1.75, -20.5, 8.25),
        (-1.75, 25.5, 8.25),
        (5.75, 25.5, 24.25),
        (-9.25, 31.5, 24.25),
        (-1.75, 31.5, 8.25),
        (-14.75, 5.5, 8.25),
        (-14.75, -7, 24.25),
        (-20.75, 5.5, 8.25),
        (-20.75, -7, 24.25),
    ]]
    fillet(fillet_3_edges, radius=FILLET_3_R - 0.0001)  # a hair under: the kernel refuses the full size

    # 圆角4
    fillet_4_edges = [part.edges().sort_by_distance(p)[0] for p in [
        (9.75, -2, 1),
        (6.75, 13, 2),
        (9.75, 13, 1),
        (6.75, 13, 0),
        (3.75, 5.5, 2),
        (3.75, 13, 1),
        (3.75, 5.5, 0),
        (3.75, -2, 1),
        (9.75, 5.5, 0),
        (6.75, -2, 0),
        (6.75, -2, 2),
        (9.75, 5.5, 2),
        (-13.25, 5.5, 2),
        (-13.25, 13, 1),
        (-13.25, 5.5, 0),
        (-10.25, -2, 2),
        (-13.25, -2, 1),
        (-10.25, -2, 0),
        (-7.25, -2, 1),
        (-7.25, 13, 1),
        (-10.25, 13, 0),
        (-7.25, 5.5, 0),
        (-7.25, 5.5, 2),
        (-10.25, 13, 2),
    ]]
    fillet(fillet_4_edges, radius=FILLET_4_R - 0.0001)  # a hair under: the kernel refuses the full size


solid = part.part
